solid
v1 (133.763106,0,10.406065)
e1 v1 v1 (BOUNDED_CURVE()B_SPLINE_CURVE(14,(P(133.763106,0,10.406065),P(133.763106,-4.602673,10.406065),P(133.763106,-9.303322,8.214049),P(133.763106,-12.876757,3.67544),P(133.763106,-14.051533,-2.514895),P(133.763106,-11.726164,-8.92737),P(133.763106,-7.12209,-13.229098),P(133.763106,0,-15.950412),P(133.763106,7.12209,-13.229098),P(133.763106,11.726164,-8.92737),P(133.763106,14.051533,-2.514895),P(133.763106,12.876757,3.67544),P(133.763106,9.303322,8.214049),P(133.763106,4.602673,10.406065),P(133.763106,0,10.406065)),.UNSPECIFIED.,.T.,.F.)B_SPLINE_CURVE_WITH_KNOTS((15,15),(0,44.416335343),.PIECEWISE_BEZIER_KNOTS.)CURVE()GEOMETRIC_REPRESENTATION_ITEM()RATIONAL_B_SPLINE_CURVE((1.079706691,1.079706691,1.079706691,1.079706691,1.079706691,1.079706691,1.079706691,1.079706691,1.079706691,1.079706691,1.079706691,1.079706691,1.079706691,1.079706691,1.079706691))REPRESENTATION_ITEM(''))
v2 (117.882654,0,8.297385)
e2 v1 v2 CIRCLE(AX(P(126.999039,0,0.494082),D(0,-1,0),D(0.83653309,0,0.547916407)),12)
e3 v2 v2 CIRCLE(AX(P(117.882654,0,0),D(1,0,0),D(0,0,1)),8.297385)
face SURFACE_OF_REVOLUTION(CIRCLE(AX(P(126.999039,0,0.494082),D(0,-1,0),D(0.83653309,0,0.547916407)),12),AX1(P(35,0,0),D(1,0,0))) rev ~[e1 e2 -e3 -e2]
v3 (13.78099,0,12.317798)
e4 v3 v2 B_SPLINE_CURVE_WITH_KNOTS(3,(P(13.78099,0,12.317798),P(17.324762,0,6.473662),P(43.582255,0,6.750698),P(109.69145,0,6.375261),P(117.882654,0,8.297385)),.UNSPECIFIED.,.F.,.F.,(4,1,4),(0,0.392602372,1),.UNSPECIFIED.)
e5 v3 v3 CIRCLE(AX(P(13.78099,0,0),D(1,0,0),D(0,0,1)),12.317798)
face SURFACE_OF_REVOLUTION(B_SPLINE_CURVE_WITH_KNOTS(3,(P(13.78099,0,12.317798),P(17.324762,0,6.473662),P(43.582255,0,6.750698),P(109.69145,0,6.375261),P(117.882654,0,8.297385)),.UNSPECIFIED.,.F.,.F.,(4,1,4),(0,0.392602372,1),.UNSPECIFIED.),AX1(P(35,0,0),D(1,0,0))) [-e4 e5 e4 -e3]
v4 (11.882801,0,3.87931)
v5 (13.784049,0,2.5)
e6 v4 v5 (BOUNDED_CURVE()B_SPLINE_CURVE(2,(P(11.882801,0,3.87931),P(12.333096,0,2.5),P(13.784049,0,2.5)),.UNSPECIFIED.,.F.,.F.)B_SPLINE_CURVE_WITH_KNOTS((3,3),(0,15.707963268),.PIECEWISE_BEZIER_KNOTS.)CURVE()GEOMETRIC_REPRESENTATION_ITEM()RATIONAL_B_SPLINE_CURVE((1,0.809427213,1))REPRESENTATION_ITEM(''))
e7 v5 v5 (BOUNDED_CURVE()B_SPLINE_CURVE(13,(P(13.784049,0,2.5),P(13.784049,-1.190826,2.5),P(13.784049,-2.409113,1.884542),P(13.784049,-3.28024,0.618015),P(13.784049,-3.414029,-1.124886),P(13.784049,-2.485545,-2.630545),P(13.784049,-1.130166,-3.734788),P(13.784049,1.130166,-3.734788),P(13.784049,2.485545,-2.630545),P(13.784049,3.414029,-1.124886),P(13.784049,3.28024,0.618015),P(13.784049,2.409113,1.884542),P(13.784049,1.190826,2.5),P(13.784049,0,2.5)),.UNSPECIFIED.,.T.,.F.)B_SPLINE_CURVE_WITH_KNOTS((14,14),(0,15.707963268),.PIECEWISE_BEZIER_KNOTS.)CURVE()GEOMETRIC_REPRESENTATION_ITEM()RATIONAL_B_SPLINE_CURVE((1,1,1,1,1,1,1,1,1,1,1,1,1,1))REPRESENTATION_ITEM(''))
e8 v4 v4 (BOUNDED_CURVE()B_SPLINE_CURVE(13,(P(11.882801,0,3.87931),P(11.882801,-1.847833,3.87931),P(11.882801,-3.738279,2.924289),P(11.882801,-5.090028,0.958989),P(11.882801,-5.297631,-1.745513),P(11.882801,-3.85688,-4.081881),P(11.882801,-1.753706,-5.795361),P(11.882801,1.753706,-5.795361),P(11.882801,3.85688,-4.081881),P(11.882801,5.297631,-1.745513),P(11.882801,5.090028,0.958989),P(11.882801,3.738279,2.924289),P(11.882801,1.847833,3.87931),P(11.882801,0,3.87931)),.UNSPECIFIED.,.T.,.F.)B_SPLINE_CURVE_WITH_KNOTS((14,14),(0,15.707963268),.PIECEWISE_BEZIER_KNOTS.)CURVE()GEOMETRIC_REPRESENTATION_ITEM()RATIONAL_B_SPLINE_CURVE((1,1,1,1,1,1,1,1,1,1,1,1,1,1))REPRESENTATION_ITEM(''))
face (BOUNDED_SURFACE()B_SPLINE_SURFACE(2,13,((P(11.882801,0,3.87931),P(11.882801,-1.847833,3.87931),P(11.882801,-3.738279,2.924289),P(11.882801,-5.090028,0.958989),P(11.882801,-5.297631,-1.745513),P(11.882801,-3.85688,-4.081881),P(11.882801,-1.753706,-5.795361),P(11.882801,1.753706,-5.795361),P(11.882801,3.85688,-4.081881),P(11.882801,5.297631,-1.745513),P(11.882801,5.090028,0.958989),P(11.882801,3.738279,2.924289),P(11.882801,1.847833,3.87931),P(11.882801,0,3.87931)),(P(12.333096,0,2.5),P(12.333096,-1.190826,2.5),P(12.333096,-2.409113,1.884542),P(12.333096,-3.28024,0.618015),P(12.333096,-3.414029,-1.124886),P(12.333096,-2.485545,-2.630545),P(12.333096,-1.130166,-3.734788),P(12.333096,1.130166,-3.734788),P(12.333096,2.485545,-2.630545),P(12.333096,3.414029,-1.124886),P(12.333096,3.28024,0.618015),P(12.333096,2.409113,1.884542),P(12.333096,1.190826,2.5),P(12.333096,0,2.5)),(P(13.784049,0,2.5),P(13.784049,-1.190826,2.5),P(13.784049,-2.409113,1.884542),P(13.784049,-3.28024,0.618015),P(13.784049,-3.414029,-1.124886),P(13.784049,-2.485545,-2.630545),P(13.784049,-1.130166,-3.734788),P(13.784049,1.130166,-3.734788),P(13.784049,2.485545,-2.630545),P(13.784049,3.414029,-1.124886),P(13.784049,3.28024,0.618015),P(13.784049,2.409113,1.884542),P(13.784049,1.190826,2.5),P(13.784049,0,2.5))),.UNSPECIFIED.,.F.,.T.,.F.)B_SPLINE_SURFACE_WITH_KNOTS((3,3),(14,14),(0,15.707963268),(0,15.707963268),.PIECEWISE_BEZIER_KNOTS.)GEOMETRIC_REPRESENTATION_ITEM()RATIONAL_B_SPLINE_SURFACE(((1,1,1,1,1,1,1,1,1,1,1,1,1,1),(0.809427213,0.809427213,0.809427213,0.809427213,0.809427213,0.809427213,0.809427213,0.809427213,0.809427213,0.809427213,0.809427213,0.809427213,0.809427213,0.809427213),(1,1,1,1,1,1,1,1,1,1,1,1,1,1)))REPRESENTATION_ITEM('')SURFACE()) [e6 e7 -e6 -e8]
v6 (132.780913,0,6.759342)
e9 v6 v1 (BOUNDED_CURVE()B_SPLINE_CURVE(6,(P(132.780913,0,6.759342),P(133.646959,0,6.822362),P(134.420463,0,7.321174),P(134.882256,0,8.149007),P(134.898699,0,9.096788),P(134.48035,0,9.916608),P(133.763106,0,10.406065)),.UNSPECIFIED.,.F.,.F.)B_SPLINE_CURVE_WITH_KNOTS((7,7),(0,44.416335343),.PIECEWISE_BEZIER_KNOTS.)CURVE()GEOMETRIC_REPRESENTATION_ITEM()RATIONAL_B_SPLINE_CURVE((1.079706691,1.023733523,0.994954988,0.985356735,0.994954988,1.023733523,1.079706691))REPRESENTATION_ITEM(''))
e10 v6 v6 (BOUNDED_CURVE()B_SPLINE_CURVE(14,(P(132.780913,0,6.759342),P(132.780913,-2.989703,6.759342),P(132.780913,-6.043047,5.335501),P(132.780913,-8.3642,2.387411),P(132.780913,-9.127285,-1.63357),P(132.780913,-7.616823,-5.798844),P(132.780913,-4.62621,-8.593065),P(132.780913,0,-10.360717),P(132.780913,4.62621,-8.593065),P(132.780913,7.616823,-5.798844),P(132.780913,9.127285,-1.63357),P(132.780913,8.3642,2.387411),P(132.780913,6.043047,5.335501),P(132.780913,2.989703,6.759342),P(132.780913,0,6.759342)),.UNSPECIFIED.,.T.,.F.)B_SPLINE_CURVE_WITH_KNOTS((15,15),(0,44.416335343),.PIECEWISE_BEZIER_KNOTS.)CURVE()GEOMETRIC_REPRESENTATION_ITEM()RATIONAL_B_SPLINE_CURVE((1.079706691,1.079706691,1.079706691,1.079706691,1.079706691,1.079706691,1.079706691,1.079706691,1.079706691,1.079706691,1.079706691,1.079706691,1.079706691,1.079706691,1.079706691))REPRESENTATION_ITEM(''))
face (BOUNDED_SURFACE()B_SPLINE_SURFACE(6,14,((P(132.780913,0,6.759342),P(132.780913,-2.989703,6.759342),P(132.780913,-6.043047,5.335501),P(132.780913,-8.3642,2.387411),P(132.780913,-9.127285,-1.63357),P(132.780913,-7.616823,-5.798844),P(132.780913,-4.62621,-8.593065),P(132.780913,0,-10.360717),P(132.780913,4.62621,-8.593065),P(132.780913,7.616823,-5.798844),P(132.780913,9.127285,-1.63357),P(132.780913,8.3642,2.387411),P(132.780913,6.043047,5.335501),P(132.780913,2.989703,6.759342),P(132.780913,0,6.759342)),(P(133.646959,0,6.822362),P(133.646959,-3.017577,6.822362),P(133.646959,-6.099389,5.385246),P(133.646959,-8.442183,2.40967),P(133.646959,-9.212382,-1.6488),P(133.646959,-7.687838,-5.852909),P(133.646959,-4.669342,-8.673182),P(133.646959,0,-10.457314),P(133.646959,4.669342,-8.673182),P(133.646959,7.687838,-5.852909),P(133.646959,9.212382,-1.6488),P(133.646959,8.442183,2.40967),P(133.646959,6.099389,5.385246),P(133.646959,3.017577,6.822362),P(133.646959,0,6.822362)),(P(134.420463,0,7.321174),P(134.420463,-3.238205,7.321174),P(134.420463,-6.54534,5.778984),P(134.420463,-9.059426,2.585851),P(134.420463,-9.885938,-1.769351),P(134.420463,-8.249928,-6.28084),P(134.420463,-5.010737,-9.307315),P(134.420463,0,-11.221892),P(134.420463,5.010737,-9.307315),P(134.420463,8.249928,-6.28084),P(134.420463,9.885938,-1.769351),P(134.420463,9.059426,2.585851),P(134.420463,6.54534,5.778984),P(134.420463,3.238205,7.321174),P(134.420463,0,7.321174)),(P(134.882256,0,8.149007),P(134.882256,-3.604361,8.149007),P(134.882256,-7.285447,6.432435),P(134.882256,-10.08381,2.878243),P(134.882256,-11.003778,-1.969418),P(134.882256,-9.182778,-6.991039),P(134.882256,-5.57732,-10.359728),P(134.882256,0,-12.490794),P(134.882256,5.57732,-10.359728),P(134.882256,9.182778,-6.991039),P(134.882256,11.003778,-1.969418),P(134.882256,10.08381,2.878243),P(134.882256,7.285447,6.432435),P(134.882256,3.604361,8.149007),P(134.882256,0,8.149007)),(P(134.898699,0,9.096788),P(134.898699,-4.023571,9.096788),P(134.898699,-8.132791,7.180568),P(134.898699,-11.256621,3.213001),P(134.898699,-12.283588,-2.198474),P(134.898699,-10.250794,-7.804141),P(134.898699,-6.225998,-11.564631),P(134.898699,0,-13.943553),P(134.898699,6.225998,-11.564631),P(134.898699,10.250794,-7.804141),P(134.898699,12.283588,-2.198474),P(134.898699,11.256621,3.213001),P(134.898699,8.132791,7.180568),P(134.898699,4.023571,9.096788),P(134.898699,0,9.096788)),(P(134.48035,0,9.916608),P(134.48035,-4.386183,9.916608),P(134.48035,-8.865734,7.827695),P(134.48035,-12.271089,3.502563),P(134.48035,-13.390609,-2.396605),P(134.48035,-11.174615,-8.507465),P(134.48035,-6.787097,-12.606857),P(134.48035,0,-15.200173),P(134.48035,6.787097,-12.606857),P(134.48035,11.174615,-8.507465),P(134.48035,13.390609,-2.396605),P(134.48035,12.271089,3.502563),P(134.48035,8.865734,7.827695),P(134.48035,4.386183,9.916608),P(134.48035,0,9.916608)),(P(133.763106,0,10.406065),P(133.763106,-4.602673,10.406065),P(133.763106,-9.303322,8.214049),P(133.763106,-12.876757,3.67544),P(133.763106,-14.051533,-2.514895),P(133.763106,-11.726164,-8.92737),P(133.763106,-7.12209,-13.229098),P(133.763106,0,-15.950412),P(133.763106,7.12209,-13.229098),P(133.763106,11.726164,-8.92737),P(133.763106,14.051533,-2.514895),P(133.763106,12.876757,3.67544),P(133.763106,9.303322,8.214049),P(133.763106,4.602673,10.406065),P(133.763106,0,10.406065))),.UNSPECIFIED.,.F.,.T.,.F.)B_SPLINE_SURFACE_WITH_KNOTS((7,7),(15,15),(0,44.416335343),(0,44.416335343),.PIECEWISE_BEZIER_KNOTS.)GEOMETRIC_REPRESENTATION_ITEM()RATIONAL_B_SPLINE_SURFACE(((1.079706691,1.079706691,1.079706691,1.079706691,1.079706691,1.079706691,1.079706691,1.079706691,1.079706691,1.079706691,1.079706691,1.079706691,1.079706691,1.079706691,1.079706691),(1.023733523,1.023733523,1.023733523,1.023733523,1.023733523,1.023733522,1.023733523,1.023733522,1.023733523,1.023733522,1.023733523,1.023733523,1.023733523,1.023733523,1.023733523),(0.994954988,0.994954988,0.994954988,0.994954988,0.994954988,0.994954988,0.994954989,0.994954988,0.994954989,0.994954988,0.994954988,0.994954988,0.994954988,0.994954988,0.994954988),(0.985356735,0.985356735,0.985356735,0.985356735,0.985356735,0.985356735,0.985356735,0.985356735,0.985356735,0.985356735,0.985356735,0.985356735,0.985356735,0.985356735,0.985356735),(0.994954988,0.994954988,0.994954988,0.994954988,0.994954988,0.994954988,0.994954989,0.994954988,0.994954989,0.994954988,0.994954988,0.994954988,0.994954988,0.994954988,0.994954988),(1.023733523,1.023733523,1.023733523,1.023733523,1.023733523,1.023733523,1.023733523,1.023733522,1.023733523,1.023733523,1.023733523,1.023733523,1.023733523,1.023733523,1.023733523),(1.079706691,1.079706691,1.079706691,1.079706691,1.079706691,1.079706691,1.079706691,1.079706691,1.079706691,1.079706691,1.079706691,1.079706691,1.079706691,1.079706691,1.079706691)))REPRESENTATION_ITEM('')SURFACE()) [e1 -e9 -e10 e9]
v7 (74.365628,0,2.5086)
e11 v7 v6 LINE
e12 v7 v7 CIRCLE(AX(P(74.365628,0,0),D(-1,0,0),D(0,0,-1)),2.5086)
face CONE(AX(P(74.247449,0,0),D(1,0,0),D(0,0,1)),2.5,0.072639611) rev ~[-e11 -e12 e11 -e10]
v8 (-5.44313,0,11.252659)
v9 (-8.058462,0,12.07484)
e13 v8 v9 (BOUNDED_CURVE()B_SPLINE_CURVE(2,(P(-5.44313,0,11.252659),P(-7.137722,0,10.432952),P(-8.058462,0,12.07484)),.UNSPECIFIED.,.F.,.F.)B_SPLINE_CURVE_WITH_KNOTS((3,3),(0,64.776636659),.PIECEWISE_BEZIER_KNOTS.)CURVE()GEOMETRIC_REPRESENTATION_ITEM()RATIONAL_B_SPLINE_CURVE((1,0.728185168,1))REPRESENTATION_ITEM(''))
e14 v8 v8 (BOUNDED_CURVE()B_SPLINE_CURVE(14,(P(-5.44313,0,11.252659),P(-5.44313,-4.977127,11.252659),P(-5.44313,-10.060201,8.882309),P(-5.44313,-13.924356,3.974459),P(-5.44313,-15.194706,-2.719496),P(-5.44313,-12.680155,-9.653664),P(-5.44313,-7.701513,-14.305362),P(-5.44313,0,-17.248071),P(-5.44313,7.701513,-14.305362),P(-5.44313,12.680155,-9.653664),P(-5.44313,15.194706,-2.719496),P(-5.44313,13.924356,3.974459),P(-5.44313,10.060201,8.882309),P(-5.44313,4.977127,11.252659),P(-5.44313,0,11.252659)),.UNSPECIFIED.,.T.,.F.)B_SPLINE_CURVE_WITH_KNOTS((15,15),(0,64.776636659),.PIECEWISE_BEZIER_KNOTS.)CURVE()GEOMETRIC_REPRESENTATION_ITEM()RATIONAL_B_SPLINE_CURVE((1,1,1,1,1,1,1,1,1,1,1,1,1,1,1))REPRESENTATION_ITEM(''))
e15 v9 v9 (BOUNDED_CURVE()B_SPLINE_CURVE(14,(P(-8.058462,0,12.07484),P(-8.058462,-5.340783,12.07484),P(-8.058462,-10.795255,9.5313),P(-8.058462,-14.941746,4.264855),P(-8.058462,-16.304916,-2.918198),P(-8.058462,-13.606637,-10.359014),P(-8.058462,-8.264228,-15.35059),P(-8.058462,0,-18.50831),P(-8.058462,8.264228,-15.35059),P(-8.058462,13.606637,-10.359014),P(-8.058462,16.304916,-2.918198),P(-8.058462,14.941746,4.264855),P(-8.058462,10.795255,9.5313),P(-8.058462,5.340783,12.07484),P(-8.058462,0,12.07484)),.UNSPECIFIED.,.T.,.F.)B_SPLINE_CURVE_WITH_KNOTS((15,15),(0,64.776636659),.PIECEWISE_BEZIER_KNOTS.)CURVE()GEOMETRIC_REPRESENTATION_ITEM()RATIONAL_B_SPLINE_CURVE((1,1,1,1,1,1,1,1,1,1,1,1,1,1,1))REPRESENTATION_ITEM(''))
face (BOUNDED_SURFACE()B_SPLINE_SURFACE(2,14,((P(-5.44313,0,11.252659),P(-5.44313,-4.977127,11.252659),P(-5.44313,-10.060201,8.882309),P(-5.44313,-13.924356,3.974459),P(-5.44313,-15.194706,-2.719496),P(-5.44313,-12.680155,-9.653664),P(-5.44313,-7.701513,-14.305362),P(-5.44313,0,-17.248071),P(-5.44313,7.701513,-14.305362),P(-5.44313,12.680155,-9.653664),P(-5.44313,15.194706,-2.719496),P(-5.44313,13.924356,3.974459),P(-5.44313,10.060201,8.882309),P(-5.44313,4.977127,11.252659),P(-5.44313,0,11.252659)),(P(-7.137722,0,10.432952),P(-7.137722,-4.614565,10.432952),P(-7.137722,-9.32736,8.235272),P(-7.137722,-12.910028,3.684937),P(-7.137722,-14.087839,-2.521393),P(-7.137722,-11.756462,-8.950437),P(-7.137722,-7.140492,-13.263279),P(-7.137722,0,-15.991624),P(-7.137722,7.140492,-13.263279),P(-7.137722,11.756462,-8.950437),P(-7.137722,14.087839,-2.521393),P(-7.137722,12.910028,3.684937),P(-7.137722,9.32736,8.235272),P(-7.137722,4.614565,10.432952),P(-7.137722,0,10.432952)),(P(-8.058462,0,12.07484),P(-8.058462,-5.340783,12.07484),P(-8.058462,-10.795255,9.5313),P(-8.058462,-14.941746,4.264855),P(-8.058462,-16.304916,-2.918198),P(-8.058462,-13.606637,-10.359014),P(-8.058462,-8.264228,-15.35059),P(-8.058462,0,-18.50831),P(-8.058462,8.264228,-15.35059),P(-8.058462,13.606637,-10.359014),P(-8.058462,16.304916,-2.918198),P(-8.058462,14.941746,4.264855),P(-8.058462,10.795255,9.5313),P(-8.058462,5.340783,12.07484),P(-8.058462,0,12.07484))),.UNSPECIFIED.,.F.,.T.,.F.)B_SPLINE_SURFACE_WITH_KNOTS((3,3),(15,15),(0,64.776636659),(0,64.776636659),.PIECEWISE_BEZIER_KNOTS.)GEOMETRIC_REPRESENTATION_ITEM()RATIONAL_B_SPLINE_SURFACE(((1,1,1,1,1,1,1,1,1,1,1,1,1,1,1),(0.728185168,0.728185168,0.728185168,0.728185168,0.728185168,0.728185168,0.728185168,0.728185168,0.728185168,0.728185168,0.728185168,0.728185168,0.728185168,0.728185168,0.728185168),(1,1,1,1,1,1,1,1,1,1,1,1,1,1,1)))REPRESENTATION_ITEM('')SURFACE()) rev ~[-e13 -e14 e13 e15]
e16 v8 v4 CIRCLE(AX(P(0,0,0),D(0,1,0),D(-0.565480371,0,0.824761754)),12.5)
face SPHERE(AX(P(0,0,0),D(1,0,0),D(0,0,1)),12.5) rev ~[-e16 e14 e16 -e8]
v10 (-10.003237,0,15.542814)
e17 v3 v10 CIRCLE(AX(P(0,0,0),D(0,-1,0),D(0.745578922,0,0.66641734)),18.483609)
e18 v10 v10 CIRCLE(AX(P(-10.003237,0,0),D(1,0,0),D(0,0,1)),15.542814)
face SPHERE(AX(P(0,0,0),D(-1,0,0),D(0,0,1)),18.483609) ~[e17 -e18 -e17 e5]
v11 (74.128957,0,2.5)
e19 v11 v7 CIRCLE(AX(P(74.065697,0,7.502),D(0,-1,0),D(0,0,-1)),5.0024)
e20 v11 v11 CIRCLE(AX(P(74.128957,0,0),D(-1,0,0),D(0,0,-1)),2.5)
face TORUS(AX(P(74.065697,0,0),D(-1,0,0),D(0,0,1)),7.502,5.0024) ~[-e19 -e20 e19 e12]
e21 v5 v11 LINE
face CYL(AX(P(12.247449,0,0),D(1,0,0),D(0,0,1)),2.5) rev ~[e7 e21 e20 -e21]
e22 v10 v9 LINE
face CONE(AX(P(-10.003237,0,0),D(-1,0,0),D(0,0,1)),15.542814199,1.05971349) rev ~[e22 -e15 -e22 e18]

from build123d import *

# Parameters (mm, degrees)
F2_R = 2


# Not quite as in the source:
# - a fillet or chamfer that OpenCascade refuses, or shapes differently, is made with other operations: its cross-section is extruded or revolved along the edge and cut away or added


with BuildPart() as f1:
    # F0 (on Front) → F1 (revolve)
    with BuildSketch(Plane.XZ):
        with BuildLine():
            ThreePointArc((-7.0685046336, 10.3095219212), (4.6853520259, 11.5886788028), (12.2474487139, 2.5))
            Line((12.2474487139, 2.5), (74.2474487139, 2.5))
            Line((74.2474487139, 2.5), (137.0374359825, 7.0690793239))
            ThreePointArc((137.0374359825, 7.0690793239), (127.7669650478, 12.4694859534), (117.8826543599, 8.2973851228))
            add(Edge.make_bspline(
                [(13.7809895682, 12.3177978136), (17.3247616462, 6.4736620698), (43.5822553755, 6.750698096), (109.6914496017, 6.3752606308), (117.8826543599, 8.2973851228)],
                knots=[0, 0, 0, 0, 0.3926023717, 1, 1, 1, 1], degree=3))
            ThreePointArc((13.7809895682, 12.3177978136), (2.4835532955, 18.3159979112), (-10.003236638, 15.5428141988))
            Line((-10.003236638, 15.5428141988), (-7.0685046336, 10.3095219212))
        make_face()
    revolve(axis=Axis((35, 0, 0), (1, 0, 0)))

    # F2
    f2_edges = [f1.edges().sort_by_distance(p)[0] for p in [
        (137.037436, 0, -7.069079),
        (-7.068505, 0, -10.309522),
        (12.247449, 0, -2.5),
    ]]
    fillet(f2_edges, radius=F2_R)

    # F3: fillet of radius 5 on 1 edges, made by hand

    # F3_s1 → F3_t2 (revolve, cut)
    with BuildSketch(Plane.XZ):
        with BuildLine():
            ThreePointArc((74.0656971228, 2.4996), (74.247343375, 2.5028990409), (74.4287500388, 2.5127918123))
            Line((74.4287500388, 2.5127918123), (74.4650553304, 2.0138709935))
            ThreePointArc((74.4650553304, 2.0138709935), (74.3743901528, 2.00767456), (74.2837540055, 2.0010791812))
            Line((74.2837540055, 2.0010791812), (74.2474487139, 1.99976))
            ThreePointArc((74.2474487139, 1.99976), (74.1565729184, 1.99976), (74.0656971228, 1.99936))
            Line((74.0656971228, 1.99936), (74.0656971228, 2.4996))
        make_face()
    revolve(axis=Axis((74.2474487139, 0, 0), (1, 0, 0)), mode=Mode.SUBTRACT)


solid = f1.part
